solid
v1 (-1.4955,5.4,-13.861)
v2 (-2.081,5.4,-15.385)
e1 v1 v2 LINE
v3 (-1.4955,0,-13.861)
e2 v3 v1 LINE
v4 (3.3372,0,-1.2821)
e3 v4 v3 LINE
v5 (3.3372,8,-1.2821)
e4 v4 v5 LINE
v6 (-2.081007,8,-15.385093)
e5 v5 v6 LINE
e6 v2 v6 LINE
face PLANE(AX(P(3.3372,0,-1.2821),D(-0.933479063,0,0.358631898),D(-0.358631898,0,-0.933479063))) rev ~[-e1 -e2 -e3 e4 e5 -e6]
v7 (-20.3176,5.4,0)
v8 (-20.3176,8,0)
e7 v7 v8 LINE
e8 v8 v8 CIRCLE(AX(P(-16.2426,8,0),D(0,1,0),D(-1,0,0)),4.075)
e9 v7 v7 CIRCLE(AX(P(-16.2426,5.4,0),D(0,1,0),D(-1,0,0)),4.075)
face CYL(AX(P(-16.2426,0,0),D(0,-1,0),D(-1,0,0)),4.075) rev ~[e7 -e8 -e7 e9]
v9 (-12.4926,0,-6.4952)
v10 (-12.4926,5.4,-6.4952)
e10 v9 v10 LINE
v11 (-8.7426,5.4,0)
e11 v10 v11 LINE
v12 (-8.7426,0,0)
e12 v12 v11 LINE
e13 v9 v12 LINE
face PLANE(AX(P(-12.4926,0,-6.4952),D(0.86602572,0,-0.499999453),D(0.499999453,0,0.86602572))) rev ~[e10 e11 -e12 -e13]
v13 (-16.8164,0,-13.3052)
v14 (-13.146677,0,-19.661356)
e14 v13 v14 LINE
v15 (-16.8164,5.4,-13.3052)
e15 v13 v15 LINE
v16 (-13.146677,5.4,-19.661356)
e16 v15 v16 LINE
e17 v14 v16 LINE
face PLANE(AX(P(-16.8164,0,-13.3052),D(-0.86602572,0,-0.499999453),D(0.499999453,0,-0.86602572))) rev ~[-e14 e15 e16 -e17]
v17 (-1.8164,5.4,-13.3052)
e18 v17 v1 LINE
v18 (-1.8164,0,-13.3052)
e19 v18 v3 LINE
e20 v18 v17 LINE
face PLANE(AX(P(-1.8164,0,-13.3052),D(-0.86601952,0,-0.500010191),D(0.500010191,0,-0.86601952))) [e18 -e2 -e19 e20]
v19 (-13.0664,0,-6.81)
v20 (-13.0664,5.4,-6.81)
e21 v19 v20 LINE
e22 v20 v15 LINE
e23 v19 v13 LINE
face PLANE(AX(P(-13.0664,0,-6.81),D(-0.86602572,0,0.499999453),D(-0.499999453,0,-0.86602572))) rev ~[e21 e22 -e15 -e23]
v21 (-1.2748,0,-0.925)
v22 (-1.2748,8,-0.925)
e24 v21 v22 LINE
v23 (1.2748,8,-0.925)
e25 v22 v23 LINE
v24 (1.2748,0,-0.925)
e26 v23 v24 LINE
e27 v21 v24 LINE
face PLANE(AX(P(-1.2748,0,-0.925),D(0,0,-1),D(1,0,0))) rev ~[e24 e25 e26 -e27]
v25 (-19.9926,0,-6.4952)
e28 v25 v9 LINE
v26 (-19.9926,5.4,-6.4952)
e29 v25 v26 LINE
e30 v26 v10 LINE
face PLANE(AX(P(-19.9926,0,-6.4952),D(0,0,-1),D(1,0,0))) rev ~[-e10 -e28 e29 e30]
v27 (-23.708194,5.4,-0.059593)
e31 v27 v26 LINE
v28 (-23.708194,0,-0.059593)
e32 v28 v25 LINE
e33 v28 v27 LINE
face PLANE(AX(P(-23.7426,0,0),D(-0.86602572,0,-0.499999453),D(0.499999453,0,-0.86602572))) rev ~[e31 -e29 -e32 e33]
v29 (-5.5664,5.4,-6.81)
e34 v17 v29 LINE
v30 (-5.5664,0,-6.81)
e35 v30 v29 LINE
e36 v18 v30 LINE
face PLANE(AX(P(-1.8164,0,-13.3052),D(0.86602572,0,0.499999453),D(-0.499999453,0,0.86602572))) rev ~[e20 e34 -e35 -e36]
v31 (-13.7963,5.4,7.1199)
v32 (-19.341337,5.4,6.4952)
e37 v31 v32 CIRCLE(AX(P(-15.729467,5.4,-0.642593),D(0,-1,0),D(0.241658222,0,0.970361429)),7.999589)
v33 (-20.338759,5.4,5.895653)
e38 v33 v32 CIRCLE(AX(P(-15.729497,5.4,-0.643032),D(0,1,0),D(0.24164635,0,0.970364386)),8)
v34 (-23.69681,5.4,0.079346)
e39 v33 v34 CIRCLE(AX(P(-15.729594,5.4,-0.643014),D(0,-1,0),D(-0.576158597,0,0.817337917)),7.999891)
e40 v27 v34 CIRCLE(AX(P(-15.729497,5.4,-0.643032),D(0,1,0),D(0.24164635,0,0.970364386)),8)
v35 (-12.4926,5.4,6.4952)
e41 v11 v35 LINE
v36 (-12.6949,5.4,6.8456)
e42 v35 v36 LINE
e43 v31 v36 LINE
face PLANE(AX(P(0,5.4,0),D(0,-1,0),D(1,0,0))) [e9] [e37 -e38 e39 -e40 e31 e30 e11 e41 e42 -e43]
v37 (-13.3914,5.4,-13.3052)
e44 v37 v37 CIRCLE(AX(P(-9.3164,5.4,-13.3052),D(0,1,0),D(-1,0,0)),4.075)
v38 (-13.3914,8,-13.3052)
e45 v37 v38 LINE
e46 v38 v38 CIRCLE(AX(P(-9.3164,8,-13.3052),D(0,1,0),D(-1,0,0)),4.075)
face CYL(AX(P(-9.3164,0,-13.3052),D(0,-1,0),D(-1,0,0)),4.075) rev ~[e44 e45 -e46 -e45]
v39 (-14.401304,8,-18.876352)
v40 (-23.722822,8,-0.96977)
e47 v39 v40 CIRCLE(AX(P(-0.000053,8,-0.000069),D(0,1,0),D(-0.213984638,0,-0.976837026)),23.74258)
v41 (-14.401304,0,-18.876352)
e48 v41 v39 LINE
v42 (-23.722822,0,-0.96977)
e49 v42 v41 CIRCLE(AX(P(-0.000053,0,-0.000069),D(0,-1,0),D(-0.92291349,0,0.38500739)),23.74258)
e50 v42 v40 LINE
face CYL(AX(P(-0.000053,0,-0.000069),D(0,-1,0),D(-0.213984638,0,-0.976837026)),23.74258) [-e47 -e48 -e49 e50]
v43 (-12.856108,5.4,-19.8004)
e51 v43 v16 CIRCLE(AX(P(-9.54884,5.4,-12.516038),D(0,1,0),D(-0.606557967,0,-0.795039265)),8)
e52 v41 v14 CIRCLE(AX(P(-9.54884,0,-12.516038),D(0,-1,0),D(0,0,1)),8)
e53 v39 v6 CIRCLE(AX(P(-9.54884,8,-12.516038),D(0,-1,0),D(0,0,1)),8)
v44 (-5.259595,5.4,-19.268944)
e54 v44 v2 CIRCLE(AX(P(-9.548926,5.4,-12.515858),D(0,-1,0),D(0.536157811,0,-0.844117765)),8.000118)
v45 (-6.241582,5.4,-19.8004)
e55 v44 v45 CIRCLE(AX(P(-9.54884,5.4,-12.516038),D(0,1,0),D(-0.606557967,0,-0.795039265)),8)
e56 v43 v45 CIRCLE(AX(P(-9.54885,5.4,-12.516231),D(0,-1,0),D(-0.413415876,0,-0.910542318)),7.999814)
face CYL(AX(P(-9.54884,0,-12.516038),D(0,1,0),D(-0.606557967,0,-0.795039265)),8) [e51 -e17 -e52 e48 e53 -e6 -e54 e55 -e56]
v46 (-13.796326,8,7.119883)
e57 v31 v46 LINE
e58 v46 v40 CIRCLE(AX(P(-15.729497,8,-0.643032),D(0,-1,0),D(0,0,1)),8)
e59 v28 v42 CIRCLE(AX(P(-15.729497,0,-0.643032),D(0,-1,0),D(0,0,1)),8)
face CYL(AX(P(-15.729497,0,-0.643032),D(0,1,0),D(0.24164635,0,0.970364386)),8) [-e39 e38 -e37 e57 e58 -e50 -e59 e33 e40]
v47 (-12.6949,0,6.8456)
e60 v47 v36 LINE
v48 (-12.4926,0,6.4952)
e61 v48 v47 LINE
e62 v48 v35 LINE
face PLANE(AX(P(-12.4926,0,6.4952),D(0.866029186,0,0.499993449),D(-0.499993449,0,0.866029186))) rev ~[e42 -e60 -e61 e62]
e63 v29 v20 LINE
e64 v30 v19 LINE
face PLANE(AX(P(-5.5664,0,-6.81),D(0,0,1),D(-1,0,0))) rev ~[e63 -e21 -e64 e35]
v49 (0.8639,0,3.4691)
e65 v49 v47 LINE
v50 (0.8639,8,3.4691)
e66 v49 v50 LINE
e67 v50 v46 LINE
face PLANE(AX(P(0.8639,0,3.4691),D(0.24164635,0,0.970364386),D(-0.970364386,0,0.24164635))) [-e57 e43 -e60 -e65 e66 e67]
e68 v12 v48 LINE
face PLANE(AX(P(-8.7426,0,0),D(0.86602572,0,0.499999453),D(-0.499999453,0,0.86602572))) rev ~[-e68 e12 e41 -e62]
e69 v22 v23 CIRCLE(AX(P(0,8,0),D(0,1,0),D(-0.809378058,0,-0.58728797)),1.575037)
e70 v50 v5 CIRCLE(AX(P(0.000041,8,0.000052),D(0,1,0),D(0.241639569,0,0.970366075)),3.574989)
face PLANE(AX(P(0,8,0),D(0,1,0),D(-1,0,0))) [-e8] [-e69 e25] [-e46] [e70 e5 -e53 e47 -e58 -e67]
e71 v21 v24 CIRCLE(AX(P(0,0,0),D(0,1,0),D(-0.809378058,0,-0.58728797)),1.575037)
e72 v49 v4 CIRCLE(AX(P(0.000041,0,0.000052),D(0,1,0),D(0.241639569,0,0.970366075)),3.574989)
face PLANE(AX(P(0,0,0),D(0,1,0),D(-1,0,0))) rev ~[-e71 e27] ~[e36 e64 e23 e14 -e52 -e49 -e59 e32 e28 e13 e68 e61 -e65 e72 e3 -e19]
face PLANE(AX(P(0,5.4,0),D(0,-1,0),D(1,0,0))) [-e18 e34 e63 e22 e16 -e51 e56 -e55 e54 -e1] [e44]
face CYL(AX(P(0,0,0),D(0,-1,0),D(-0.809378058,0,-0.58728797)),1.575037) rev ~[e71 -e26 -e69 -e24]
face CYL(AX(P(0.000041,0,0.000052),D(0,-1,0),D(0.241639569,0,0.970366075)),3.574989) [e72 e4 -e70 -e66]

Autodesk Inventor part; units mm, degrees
ref_plane "YZ Plane" through (0, 0, 0) normal (1, 0, 0) x (0, 1, 0)
ref_plane "XZ Plane" through (0, 0, 0) normal (0, 1, 0) x (-1, 0, 0)
ref_plane "XY Plane" through (0, 0, 0) normal (0, 0, 1) x (1, 0, 0)
sketch "Sketch1" plane through (0, 0, 0) normal (0, 1, 0) x (-1, 0, 0)
  arc A0 (1.2748, -0.925) -> (-1.2748, -0.925) centre (0, 0) ccw
  line L0 (1.2748, -0.925) -> (-1.2748, -0.925)
  arc A1 (-0.8639, 3.4691) -> (-3.3372, -1.2821) centre (0, 0) ccw
  line L1 (-0.8639, 3.4691) -> (21.9124, 9.141)
  line L2 (-3.3372, -1.2821) -> (5.0806, -23.1927)
  arc A2 (5.0806, -23.1927) -> (21.9124, 9.141) centre (0, 0) ccw
  circle A3 centre (16.2426, 0) radius 4.075
  circle A4 centre (9.3164, -13.3052) radius 4.075
  circle A5 centre (16.2426, 0) radius 7.5 construction
  circle A6 centre (9.3164, -13.3052) radius 7.5 construction
  line L3 (0, 0) -> (16.2426, 0) construction
  line L4 (0, 0) -> (9.3164, -13.3052) construction
  line L5 (12.4926, -6.4952) -> (8.7426, 0)
  line L6 (8.7426, 0) -> (12.4926, 6.4952)
  line L7 (12.4926, 6.4952) -> (19.9926, 6.4952)
  line L8 (19.9926, 6.4952) -> (23.7426, 0)
  line L9 (23.7426, 0) -> (19.9926, -6.4952)
  line L10 (19.9926, -6.4952) -> (12.4926, -6.4952)
  line L11 (16.8164, -13.3052) -> (13.0664, -19.8004)
  line L12 (13.0664, -19.8004) -> (5.5664, -19.8004)
  line L13 (5.5664, -19.8004) -> (1.8164, -13.3052)
  line L14 (1.8164, -13.3052) -> (5.5664, -6.81)
  line L15 (5.5664, -6.81) -> (13.0664, -6.81)
  line L16 (13.0664, -6.81) -> (16.8164, -13.3052)
  dimension "d5" = 15
  dimension "d6" = 15
  dimension "d0" = 3.15
  dimension "d1" = 2.5
  dimension "d2" = 2
  dimension "d3" = 8.15
  dimension "d4" = 8.15
  dimension "d7" = 55
extrude "Extrusion1" add sketch "Sketch1" along normal blind 8 contours L9 L10 L5 L6 L7 L8 | L1 A2 L2 A1 | L11 L12 L13 L14 L15 L16
fillet "Fillet1" radius 8 2 edges at (-21.9124, 4, 9.141) (-5.0806, 4, -23.1927)
extrude "Extrusion2" cut sketch "Sketch1" along normal blind 5.4 contours L9 L10 L5 L6 L7 L8 | L11 L12 L13 L14 L15 L16
sketch "Sketch2" plane through (0, 0, 0) normal (0, -1, 0) x (1, 0, 0)
  arc A0 (-12.8561, -19.8004) -> (-6.2416, -19.8004) centre (-9.5488, -12.516) ccw projected
  line L0 (-6.2416, -19.8004) -> (-12.8561, -19.8004) projected
  arc A1 (-12.8561, -19.8004) -> (-6.2416, -19.8004) centre (-9.5488, -12.516) ccw projected
  line L1 (-23.6968, 0.0794) -> (-20.3388, 5.8956) projected
  arc A2 (-20.3388, 5.8956) -> (-23.6968, 0.0794) centre (-15.7295, -0.6431) ccw projected
  line L2 (-12.4926, 6.4952) -> (-8.7426, 0) projected
  line L3 (-12.4926, 6.4952) -> (-12.6949, 6.8456)
  line L4 (-13.7963, 7.1199) -> (0.8639, 3.4691) projected
  line L5 (-5.5664, -6.81) -> (-1.8164, -13.3052) projected
  line L6 (-1.8164, -13.3052) -> (-1.4955, -13.861)
  line L7 (3.3372, -1.2821) -> (-2.081, -15.385) projected
  line L8 (-1.2748, -0.925) -> (1.2748, -0.925) projected
  arc A3 (1.2748, -0.925) -> (-1.2748, -0.925) centre (0, 0) ccw projected
  line L9 (-13.1467, -19.6613) -> (-16.8164, -13.3052) projected
  line L10 (-16.8164, -13.3052) -> (-13.0664, -6.81) projected
  line L11 (-13.0664, -6.81) -> (-5.5664, -6.81) projected
  line L12 (-5.5664, -6.81) -> (-1.8164, -13.3052) projected
  line L13 (-1.8164, -13.3052) -> (-5.2596, -19.2689) projected
  arc A4 (-5.2596, -19.2689) -> (-2.081, -15.385) centre (-9.5488, -12.516) ccw projected
  line L14 (3.3372, -1.2821) -> (-2.081, -15.385) projected
  arc A5 (3.3372, -1.2821) -> (0.8639, 3.4691) centre (0, 0) ccw projected
  line L15 (-13.7963, 7.1199) -> (0.8639, 3.4691) projected
  arc A6 (-13.7963, 7.1199) -> (-19.3413, 6.4952) centre (-15.7295, -0.6431) ccw projected
  line L16 (-19.3413, 6.4952) -> (-12.4926, 6.4952) projected
  line L17 (-12.4926, 6.4952) -> (-8.7426, 0) projected
  line L18 (-8.7426, 0) -> (-12.4926, -6.4952) projected
  line L19 (-12.4926, -6.4952) -> (-19.9926, -6.4952) projected
  line L20 (-19.9926, -6.4952) -> (-23.7082, -0.0597) projected
  arc A7 (-23.7082, -0.0597) -> (-23.7228, -0.9698) centre (-15.7295, -0.6431) ccw projected
  arc A8 (-23.7228, -0.9698) -> (-14.4013, -18.8763) centre (0, 0) ccw projected
  arc A9 (-14.4013, -18.8763) -> (-13.1467, -19.6613) centre (-9.5488, -12.516) ccw projected
  point P0 (-2.081, -15.385)
  point P1 (-13.7963, 7.1199)
extrude "Extrusion3" cut sketch "Sketch2" against normal up to surface (5.4 mm away) contours L0 A0 | A2 L1 | L16 A6 L4 L3 | L7 A4 L13 L6 | A3 L8
properties part number "Desbalanceo"
